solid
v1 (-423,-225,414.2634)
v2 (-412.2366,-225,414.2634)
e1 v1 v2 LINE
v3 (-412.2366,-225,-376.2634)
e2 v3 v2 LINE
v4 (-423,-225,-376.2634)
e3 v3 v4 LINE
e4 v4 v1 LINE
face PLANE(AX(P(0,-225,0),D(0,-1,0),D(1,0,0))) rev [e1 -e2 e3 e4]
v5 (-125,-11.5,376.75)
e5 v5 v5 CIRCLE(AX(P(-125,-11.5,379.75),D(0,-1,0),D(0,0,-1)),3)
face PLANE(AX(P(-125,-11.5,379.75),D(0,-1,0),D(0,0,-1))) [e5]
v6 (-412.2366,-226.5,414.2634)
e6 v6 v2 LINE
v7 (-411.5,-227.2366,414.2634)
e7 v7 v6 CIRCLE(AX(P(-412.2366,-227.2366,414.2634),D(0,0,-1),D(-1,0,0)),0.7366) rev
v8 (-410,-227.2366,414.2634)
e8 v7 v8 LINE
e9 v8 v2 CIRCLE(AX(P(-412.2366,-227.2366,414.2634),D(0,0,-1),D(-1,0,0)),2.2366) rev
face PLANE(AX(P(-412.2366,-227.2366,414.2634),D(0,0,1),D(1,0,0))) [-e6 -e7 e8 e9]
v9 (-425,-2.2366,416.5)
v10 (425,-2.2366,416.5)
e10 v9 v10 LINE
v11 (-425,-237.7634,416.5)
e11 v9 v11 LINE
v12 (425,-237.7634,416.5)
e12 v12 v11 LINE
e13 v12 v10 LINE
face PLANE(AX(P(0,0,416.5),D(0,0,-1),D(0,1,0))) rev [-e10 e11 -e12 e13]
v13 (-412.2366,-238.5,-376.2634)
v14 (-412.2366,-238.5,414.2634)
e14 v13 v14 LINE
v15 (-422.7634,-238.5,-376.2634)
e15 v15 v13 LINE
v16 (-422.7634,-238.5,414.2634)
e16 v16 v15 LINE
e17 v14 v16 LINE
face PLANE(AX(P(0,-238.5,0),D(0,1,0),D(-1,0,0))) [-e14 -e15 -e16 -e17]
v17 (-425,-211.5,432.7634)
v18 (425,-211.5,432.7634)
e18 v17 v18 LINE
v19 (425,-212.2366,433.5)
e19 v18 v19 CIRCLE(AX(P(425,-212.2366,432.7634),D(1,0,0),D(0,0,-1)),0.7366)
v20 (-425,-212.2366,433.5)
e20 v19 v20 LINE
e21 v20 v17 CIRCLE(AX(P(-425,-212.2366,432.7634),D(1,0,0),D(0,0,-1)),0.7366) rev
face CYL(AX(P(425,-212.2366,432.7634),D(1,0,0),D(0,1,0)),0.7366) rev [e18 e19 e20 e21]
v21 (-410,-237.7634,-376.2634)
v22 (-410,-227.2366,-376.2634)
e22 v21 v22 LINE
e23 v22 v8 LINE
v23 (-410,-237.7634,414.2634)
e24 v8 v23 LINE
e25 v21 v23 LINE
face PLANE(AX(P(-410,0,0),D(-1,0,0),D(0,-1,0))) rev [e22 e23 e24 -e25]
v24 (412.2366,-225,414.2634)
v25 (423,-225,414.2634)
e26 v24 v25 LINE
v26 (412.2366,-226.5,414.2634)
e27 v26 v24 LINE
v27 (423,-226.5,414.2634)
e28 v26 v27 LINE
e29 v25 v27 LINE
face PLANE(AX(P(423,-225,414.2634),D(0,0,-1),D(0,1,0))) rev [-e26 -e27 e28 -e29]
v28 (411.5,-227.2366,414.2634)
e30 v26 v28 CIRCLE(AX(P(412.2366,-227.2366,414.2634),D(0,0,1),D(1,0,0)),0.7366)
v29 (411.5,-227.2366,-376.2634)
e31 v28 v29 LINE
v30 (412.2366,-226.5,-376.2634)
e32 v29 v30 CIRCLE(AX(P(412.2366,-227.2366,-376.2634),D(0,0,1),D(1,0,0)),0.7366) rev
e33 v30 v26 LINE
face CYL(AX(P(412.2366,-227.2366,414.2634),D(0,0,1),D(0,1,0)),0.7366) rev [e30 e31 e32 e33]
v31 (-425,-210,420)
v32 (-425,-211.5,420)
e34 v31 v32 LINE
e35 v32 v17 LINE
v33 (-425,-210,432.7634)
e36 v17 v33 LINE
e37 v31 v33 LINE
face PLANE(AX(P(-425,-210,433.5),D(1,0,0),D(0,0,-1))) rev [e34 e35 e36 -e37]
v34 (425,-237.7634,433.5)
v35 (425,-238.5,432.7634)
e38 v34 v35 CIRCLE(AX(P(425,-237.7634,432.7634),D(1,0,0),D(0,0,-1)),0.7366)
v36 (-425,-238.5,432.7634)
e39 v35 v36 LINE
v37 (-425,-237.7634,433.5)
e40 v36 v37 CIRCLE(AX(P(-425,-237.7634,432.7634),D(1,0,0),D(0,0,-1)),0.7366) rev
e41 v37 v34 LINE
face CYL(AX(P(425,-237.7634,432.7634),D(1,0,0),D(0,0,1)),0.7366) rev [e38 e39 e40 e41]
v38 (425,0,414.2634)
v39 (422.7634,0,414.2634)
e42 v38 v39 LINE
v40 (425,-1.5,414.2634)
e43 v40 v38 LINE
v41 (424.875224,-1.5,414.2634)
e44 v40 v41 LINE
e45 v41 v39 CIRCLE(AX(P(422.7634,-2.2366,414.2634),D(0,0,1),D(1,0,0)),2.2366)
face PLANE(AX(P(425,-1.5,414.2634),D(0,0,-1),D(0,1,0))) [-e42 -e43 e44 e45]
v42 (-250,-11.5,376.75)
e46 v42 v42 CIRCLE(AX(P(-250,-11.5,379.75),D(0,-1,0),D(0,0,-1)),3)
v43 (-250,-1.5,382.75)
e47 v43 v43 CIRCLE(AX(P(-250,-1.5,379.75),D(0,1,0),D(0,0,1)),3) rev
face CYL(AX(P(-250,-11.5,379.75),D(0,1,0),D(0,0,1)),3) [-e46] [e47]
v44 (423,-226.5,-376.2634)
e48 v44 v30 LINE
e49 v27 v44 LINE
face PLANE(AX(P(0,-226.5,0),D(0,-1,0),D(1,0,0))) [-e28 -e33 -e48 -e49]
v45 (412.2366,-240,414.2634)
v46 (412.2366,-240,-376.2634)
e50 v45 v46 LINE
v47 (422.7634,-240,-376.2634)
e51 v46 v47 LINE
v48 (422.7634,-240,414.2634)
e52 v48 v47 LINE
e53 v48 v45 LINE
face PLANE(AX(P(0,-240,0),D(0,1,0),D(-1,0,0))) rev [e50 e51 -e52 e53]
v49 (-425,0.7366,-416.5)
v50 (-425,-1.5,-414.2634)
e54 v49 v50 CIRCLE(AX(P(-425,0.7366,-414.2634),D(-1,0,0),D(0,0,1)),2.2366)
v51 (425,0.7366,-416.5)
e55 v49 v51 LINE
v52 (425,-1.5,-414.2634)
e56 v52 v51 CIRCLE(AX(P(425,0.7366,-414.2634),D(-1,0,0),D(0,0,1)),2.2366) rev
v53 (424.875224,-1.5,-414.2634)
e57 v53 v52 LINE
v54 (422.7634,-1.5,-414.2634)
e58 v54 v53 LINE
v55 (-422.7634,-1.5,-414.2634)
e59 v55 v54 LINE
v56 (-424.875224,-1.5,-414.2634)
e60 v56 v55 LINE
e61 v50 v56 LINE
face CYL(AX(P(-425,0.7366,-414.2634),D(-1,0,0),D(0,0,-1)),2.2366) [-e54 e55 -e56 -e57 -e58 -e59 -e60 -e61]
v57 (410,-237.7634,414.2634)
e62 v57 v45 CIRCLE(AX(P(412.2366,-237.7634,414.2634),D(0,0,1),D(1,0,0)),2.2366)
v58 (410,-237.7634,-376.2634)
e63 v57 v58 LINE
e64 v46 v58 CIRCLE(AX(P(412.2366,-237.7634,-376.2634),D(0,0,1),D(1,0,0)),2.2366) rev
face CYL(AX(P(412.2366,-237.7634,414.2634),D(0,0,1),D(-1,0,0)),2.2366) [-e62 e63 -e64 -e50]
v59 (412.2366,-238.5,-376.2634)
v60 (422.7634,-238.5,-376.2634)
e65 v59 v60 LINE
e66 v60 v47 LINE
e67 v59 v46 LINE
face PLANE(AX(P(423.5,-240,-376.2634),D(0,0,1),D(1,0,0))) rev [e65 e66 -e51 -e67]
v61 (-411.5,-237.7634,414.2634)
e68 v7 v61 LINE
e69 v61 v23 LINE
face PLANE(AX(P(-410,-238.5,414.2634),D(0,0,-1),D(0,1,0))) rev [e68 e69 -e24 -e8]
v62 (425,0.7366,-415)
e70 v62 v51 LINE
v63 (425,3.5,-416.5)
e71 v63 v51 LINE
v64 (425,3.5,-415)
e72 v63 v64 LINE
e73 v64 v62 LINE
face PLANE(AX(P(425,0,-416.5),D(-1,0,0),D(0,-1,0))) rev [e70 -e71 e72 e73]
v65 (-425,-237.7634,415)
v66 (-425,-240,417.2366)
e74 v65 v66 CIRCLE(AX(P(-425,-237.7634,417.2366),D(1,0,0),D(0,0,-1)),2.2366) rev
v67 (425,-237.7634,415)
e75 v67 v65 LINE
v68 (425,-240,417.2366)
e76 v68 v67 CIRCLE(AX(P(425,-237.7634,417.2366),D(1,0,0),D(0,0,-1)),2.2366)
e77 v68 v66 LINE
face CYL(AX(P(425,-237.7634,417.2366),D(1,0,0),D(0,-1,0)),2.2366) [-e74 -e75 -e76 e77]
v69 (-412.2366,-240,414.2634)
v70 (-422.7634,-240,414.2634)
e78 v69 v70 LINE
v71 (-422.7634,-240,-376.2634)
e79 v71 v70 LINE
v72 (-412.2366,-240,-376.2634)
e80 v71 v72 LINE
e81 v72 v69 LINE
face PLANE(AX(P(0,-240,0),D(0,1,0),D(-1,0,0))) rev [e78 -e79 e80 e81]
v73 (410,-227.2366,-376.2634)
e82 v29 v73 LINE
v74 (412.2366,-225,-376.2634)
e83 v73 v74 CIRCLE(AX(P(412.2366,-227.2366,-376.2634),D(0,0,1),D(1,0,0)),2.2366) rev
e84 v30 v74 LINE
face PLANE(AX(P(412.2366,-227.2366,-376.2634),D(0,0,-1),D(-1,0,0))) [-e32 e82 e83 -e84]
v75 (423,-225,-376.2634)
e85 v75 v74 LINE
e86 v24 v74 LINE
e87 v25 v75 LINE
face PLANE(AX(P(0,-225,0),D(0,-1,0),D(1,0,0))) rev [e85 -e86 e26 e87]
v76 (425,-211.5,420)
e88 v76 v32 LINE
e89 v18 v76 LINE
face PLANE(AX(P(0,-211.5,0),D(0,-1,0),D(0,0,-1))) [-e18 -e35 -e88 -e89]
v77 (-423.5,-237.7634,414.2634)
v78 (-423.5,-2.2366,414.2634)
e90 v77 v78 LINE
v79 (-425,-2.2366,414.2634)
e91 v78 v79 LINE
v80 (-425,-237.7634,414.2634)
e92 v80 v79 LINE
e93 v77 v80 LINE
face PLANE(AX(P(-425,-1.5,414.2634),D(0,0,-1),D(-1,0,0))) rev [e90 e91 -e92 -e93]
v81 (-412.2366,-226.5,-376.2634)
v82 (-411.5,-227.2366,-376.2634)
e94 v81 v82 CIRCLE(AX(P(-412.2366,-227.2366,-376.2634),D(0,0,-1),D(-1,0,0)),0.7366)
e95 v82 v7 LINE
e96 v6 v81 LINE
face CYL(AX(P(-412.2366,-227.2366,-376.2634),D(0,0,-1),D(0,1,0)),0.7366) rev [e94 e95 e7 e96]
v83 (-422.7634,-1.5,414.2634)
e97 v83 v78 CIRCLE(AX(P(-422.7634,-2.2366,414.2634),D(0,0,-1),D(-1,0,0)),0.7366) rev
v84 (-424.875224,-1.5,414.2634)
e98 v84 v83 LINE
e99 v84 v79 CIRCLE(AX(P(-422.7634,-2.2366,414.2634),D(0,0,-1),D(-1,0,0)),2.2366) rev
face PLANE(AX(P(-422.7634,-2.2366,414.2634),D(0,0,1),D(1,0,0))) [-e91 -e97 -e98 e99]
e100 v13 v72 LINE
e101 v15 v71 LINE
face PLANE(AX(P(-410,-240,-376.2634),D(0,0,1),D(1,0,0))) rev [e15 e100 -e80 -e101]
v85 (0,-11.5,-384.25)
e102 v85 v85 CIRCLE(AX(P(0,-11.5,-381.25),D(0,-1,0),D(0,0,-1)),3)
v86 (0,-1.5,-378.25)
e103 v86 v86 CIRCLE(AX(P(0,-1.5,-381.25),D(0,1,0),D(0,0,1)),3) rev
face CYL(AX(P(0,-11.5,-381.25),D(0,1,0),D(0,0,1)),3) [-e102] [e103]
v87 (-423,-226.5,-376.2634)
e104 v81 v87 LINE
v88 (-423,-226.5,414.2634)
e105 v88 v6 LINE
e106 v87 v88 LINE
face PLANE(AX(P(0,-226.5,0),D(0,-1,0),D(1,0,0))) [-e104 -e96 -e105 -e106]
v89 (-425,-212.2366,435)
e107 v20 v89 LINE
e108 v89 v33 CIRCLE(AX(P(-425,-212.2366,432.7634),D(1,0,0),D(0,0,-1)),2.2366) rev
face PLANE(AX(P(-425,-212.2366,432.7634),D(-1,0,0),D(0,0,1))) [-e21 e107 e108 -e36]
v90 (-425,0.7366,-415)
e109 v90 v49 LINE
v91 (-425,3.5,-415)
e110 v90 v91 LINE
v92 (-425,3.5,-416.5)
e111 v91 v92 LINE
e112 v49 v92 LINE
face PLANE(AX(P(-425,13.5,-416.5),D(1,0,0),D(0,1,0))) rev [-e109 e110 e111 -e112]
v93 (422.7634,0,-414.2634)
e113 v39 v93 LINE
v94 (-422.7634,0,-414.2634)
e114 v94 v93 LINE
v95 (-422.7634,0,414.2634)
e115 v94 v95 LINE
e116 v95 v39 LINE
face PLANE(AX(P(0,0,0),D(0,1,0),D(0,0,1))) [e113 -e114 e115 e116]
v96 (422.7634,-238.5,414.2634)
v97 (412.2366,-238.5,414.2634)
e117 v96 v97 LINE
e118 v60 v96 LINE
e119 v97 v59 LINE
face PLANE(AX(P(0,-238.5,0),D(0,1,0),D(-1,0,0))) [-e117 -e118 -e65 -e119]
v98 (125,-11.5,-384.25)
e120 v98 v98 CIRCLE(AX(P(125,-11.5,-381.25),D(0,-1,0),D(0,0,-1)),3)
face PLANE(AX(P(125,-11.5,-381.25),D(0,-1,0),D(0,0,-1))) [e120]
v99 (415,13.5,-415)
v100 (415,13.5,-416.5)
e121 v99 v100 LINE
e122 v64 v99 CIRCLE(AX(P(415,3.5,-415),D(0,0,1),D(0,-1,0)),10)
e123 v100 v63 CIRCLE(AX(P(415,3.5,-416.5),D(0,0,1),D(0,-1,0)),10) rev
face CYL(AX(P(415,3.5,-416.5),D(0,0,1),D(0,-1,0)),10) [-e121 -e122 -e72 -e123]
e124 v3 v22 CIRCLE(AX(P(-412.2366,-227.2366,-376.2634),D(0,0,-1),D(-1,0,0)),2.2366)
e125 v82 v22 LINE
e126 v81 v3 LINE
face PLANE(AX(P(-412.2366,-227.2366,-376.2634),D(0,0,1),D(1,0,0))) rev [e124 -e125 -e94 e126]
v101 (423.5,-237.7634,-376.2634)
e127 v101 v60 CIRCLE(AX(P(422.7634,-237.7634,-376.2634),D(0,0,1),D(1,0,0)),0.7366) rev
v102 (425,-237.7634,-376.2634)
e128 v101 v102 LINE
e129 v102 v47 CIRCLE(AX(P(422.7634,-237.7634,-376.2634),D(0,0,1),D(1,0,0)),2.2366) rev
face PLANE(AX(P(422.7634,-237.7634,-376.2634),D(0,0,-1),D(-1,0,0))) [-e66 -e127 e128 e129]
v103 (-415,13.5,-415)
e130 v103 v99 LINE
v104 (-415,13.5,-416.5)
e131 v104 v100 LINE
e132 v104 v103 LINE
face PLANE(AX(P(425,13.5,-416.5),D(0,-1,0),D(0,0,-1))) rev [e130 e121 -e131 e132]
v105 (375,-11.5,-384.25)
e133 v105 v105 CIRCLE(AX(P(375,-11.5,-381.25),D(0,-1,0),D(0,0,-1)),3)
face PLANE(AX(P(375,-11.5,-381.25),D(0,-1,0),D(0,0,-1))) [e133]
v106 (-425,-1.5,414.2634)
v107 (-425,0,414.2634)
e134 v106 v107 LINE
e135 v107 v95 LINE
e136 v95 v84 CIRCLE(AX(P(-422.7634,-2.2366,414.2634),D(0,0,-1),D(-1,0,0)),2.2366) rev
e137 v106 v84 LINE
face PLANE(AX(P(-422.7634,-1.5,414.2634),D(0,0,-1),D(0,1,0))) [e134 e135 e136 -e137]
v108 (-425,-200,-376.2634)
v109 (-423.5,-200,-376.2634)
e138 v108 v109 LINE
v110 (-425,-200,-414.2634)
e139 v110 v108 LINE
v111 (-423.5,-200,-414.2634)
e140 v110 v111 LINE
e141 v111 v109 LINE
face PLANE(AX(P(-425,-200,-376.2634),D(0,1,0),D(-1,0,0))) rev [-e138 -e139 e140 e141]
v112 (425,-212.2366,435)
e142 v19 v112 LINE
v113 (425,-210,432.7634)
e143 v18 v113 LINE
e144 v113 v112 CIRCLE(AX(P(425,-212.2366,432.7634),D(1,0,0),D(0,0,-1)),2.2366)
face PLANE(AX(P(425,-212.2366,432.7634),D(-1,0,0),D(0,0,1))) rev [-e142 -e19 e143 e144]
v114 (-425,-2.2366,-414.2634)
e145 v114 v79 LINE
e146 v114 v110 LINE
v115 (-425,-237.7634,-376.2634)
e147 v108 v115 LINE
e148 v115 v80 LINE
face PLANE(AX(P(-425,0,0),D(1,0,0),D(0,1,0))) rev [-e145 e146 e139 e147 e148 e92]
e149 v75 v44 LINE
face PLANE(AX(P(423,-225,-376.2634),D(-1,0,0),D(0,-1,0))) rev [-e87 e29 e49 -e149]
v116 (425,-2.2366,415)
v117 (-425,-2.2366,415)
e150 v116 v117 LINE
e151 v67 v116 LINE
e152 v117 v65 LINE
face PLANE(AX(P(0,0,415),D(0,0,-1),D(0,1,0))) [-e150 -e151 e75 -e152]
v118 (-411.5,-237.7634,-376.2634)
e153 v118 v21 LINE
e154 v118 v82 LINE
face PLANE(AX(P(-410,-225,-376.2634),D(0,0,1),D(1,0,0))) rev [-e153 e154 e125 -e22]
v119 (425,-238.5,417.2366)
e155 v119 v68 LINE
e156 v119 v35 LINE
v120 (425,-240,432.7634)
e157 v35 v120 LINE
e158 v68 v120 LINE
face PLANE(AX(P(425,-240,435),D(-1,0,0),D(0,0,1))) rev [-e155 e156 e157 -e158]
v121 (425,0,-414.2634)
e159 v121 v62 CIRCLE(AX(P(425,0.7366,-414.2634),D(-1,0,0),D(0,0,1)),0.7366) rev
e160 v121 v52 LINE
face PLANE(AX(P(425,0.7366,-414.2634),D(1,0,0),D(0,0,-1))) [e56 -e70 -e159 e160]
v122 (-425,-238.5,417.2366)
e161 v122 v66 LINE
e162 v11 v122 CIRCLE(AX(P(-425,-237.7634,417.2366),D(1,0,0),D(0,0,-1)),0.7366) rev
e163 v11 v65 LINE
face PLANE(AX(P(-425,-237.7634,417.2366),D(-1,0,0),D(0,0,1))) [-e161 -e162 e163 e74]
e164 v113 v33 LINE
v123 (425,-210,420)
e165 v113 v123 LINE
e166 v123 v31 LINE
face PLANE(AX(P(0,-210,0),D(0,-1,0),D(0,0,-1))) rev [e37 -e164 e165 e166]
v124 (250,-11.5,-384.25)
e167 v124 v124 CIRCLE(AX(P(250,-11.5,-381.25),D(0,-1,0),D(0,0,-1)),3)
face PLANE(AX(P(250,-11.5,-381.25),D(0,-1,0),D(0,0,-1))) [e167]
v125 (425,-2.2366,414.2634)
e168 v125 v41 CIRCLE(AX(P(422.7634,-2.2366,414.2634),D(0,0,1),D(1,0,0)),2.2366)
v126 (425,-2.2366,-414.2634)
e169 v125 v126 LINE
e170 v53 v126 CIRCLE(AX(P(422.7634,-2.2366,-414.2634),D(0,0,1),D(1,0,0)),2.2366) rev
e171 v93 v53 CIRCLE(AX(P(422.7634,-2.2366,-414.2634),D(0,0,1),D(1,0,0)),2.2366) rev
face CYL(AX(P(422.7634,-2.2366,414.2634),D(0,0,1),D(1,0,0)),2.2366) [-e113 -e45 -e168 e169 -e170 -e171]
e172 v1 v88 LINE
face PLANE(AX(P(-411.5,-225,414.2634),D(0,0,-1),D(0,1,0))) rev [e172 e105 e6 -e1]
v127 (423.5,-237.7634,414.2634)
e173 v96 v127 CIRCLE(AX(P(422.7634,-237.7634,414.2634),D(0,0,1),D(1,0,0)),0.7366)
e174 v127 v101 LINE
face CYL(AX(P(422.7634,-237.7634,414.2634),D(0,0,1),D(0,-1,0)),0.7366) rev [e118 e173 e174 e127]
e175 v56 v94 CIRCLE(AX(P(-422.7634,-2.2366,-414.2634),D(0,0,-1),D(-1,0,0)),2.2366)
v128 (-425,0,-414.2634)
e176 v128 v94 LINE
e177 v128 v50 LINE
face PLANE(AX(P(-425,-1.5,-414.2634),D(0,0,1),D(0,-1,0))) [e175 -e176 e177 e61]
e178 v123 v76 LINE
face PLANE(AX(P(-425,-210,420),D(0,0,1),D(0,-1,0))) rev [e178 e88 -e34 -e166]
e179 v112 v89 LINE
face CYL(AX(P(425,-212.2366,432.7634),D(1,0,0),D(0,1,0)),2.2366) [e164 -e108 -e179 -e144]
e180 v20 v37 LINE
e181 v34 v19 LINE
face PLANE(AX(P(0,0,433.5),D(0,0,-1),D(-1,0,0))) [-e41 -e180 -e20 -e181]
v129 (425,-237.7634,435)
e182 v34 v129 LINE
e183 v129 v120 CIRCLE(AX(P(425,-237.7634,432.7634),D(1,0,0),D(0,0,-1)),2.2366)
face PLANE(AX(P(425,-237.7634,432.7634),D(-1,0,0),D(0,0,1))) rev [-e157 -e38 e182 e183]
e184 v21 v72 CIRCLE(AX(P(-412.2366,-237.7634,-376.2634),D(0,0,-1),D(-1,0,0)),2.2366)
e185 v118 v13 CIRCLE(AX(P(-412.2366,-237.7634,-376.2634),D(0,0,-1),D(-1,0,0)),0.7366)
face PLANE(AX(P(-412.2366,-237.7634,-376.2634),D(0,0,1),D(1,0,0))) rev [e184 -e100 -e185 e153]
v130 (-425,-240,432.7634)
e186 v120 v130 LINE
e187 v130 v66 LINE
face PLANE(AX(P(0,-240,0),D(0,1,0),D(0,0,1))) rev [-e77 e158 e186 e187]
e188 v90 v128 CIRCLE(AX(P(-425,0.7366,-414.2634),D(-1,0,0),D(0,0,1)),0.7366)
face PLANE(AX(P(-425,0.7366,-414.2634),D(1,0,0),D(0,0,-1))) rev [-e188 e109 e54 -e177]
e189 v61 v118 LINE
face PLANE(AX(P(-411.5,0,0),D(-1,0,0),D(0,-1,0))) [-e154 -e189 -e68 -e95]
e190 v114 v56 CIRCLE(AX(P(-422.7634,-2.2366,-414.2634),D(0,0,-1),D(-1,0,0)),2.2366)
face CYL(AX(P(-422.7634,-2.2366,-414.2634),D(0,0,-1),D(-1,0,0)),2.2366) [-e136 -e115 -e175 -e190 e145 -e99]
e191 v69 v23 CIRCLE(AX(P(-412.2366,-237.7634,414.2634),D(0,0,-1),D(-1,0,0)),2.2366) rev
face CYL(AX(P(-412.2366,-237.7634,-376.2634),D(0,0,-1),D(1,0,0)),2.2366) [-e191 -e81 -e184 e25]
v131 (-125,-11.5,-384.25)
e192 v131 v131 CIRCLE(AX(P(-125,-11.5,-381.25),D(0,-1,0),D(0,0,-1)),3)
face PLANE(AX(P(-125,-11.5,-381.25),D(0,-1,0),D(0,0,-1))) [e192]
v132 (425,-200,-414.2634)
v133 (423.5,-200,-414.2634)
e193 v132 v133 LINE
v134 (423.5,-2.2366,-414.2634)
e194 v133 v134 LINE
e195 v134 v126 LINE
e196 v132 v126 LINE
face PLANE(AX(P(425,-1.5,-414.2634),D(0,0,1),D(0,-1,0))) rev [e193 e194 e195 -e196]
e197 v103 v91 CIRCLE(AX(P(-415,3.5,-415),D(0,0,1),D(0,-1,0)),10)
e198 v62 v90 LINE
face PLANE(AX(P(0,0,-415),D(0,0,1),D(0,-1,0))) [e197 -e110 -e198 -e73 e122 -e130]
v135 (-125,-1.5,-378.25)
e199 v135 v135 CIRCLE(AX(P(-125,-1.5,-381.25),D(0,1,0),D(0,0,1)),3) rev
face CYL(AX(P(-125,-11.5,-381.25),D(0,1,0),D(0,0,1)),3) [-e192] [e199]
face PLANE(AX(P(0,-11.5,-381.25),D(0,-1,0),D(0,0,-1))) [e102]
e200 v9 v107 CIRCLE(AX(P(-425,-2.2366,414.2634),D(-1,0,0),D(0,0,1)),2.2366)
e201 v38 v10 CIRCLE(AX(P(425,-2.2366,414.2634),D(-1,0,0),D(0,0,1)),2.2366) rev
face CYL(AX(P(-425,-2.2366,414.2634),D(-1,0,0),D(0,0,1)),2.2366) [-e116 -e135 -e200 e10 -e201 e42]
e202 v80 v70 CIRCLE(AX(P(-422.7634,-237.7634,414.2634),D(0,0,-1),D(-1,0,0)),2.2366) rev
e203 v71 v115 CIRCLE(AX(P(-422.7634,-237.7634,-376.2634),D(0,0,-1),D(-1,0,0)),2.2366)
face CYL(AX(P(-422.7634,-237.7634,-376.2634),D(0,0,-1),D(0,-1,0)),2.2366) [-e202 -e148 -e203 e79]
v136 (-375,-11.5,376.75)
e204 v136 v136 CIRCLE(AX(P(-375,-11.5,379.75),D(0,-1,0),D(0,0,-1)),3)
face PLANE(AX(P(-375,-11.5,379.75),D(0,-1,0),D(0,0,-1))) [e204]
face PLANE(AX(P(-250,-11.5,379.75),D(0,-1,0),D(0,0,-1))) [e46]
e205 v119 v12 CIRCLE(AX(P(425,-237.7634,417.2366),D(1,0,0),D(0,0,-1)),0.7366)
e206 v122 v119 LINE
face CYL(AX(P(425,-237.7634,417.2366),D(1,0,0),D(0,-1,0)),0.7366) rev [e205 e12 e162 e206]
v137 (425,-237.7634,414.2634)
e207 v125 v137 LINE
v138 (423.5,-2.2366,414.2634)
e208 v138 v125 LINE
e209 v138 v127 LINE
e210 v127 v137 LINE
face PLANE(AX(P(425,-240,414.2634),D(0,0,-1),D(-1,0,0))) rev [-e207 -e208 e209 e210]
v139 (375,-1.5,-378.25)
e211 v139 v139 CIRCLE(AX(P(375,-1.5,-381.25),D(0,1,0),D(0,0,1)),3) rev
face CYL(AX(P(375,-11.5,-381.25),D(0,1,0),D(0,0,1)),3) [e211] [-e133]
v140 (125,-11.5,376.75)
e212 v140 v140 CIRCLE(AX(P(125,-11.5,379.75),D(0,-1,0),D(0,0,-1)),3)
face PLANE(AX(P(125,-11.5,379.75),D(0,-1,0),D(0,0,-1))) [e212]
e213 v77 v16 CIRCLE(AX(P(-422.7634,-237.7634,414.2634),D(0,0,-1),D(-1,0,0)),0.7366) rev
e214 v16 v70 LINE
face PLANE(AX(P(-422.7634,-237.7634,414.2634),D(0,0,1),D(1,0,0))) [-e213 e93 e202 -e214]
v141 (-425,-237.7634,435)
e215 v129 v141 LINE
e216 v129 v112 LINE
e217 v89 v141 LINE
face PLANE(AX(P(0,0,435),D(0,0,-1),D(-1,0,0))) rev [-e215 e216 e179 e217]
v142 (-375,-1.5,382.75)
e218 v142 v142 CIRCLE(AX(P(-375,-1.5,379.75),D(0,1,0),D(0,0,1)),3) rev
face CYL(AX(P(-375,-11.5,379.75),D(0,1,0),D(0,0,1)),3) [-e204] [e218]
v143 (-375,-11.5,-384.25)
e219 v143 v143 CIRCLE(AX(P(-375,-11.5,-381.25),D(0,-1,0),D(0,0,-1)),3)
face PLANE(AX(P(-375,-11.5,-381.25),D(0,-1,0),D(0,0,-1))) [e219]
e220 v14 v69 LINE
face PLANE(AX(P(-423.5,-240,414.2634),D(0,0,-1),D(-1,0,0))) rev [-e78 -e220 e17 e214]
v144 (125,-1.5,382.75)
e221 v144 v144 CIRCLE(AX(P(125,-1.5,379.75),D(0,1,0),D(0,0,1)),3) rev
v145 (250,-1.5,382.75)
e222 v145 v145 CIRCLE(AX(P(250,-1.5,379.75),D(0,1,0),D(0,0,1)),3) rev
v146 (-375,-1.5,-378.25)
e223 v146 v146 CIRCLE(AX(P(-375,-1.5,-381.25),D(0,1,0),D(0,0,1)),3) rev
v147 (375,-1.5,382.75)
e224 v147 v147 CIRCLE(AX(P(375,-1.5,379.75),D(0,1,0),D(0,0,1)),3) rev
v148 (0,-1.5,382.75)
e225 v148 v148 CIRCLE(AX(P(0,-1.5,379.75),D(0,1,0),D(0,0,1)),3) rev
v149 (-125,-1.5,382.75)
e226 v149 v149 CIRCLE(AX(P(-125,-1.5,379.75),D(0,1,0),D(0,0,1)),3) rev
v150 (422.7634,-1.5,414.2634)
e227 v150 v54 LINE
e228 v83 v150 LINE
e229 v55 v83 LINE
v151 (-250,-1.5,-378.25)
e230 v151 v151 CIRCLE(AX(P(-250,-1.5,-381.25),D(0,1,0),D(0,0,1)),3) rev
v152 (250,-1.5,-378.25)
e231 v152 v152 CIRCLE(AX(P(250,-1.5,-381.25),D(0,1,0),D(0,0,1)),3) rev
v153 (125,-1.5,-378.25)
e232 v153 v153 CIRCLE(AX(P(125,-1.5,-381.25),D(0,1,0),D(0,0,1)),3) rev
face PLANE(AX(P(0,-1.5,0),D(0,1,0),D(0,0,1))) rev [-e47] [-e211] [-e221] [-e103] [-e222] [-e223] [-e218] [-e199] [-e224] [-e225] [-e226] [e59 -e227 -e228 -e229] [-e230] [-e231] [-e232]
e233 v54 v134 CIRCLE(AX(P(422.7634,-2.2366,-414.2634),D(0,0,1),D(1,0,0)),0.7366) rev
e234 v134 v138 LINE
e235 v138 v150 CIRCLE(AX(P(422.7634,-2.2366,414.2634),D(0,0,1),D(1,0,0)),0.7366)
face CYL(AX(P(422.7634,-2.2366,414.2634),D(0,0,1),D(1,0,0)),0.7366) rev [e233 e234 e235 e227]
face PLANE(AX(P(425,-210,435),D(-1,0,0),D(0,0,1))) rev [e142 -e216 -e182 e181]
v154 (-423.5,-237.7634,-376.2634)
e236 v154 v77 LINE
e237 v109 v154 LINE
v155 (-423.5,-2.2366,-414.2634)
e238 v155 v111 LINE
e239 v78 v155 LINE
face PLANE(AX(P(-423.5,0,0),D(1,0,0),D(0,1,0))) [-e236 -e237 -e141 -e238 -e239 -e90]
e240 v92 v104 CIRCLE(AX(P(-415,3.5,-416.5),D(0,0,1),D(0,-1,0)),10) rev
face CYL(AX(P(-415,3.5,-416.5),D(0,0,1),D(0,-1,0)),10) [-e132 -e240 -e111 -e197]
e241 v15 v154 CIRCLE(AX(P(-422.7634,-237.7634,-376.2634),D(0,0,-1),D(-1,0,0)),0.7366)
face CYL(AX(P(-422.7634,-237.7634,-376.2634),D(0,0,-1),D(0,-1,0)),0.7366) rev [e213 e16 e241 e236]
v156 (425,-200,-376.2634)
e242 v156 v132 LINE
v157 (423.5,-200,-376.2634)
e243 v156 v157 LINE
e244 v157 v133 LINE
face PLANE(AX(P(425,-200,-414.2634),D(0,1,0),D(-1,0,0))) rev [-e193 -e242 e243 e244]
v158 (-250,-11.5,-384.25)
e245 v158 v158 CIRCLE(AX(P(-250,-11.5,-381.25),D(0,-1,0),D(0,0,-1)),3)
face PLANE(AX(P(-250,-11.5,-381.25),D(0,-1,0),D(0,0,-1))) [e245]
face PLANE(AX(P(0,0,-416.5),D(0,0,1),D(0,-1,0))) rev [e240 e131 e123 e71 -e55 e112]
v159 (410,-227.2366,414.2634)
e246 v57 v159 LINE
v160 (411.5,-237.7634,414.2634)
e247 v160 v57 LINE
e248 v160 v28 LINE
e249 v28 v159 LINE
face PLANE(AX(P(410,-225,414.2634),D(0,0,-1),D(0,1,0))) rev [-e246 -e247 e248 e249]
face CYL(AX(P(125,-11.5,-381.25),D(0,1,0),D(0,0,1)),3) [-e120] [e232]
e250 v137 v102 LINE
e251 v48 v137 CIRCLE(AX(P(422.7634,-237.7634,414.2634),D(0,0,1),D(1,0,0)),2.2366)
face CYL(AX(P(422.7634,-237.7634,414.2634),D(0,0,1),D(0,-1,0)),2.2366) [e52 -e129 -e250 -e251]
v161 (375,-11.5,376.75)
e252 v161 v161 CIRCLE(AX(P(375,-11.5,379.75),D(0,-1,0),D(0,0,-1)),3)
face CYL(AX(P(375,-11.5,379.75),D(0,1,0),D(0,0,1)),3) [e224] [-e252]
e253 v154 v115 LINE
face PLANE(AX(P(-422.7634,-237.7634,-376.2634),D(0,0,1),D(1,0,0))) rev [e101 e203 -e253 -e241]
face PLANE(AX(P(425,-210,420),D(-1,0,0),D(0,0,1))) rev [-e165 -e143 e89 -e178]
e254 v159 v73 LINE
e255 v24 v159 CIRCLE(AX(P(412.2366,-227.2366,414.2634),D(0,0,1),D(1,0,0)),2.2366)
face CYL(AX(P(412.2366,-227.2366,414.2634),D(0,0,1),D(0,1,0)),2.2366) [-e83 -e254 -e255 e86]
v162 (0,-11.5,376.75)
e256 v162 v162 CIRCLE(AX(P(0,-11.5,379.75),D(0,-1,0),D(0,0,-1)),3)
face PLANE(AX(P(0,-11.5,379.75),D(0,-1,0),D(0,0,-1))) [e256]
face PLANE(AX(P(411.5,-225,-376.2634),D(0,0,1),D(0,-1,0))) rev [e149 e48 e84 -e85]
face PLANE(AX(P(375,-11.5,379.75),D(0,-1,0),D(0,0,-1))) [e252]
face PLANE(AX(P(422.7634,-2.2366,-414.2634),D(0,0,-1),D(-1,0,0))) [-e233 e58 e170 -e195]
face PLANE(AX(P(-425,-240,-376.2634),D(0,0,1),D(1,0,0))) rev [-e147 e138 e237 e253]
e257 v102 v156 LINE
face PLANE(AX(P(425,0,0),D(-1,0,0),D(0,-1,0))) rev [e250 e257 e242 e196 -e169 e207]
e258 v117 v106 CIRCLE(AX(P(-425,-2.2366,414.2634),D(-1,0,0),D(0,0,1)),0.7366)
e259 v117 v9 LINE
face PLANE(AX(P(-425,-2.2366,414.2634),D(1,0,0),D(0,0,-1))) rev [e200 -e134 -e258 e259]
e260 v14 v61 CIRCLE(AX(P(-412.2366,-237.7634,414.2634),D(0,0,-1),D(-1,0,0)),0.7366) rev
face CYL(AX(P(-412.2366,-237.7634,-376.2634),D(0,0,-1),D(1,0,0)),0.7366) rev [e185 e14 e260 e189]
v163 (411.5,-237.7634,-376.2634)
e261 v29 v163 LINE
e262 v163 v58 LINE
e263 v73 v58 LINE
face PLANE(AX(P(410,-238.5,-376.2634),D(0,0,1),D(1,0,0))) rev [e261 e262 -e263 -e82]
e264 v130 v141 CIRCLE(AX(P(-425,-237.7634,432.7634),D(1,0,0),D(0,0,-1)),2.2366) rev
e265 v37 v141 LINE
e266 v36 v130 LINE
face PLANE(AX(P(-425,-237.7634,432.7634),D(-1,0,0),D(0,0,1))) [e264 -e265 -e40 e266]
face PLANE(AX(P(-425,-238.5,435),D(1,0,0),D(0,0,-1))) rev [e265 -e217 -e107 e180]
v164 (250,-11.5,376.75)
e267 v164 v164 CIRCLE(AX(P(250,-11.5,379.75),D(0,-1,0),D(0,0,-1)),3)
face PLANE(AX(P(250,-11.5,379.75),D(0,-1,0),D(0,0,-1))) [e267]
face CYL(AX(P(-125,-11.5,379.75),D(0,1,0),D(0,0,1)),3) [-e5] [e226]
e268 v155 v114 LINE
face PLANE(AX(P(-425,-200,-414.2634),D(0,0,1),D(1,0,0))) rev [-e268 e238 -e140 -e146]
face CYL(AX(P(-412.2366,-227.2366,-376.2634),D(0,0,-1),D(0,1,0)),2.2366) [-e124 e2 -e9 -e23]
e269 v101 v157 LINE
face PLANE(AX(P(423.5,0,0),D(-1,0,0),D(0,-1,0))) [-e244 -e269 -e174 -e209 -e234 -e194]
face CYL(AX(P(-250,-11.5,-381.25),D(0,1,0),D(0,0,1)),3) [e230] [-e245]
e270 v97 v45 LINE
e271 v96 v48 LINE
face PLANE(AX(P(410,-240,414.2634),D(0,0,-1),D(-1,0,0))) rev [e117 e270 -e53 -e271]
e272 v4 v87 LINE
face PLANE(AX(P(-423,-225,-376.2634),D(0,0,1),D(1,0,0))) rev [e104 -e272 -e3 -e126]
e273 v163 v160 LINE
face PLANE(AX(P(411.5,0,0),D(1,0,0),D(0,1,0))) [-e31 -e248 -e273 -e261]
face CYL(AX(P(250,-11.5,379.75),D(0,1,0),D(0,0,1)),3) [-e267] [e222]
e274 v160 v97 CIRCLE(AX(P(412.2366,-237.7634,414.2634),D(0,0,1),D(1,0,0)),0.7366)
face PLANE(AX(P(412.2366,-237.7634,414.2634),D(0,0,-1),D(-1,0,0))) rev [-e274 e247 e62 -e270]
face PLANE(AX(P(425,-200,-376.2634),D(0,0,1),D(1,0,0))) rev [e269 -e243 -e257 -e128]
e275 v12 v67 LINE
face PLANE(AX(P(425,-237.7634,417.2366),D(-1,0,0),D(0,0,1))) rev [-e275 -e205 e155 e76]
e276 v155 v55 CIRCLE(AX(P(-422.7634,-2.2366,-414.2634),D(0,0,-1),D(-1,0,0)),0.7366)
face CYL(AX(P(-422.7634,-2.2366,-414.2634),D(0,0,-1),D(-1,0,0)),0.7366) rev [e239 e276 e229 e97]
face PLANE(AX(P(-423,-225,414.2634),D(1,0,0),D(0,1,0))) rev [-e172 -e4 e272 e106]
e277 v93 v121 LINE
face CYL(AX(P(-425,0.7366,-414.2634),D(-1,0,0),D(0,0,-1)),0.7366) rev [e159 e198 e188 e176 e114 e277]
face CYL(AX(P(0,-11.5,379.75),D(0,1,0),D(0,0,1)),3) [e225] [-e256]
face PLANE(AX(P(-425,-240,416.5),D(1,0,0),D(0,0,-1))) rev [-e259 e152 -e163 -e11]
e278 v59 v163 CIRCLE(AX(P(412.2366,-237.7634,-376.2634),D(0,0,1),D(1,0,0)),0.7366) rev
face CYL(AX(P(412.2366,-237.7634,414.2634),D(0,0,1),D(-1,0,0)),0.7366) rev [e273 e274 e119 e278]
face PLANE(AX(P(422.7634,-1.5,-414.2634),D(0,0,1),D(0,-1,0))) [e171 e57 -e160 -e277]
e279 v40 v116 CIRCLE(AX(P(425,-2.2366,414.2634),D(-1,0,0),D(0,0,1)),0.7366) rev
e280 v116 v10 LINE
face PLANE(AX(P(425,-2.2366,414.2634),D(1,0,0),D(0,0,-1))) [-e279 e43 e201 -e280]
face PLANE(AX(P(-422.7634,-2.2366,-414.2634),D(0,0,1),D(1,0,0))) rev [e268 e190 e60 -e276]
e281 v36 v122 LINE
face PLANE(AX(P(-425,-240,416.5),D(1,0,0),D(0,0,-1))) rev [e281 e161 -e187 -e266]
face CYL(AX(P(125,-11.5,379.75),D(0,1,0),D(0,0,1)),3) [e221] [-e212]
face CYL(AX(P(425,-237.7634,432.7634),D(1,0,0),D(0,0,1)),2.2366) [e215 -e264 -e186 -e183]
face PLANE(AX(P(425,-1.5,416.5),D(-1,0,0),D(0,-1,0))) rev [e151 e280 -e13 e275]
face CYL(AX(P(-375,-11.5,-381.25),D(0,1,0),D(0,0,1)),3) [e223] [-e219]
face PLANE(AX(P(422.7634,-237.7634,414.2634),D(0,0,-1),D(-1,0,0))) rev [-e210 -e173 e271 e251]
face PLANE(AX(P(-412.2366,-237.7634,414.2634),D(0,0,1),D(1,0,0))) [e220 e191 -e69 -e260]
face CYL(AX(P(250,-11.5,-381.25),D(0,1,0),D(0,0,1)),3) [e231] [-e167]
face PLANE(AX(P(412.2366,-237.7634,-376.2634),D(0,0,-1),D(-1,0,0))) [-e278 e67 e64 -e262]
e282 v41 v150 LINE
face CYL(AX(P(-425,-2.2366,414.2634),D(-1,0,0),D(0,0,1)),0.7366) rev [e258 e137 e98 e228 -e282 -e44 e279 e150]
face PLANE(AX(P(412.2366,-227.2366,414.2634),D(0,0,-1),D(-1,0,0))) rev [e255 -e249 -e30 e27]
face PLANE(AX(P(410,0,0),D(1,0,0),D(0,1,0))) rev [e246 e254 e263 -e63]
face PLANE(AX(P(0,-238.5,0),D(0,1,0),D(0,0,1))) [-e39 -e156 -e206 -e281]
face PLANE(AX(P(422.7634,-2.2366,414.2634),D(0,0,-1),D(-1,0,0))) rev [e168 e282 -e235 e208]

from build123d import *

# Parameters (mm, degrees)
SKETCH_1_W                          = 850
SKETCH_1_H                          = 833
SM_BASE_FLANGE_1_DEPTH              = 1.5
SM_EDGE_FLANGE_1_STRIP_W            = 7.4732
SM_EDGE_FLANGE_1_STRIP_H            = 1.5
SM_EDGE_FLANGE_1_STRIP_CUT_DEPTH    = 850
SM_EDGE_FLANGE_1_DEPTH              = 850
SM_EDGE_FLANGE_3_STRIP_W            = 7.4732
SM_EDGE_FLANGE_3_STRIP_H            = 1.5
SM_EDGE_FLANGE_3_STRIP_CUT_DEPTH    = 850
SM_EDGE_FLANGE_3_DEPTH              = 850
SM_EDGE_FLANGE_4_STRIP_W            = 7.4732
SM_EDGE_FLANGE_4_STRIP_H            = 1.5
SM_EDGE_FLANGE_4_STRIP_CUT_DEPTH    = 850
SM_EDGE_FLANGE_4_DEPTH              = 850
SM_EDGE_FLANGE_7_STRIP_W            = 7.4732
SM_EDGE_FLANGE_7_STRIP_H            = 1.5
SM_EDGE_FLANGE_7_STRIP_CUT_DEPTH    = 828.5268
SM_EDGE_FLANGE_7_STRIP_2_W          = 7.4732
SM_EDGE_FLANGE_7_STRIP_2_H          = 1.5
SM_EDGE_FLANGE_7_STRIP_CUT_2_DEPTH  = 828.5268
SM_EDGE_FLANGE_7_DEPTH              = 828.5268
SM_EDGE_FLANGE_7_FLAT_DEPTH         = 1.5
SM_EDGE_FLANGE_7_BEND_DEPTH         = 828.5268
SM_EDGE_FLANGE_7_FLAT_2_DEPTH       = 1.5
SM_EDGE_FLANGE_8_STRIP_W            = 7.4732
SM_EDGE_FLANGE_8_STRIP_H            = 1.5
SM_EDGE_FLANGE_8_STRIP_CUT_DEPTH    = 790.5268
SM_EDGE_FLANGE_8_STRIP_2_W          = 7.4732
SM_EDGE_FLANGE_8_STRIP_2_H          = 1.5
SM_EDGE_FLANGE_8_STRIP_CUT_2_DEPTH  = 790.5268
SM_EDGE_FLANGE_8_DEPTH              = 790.5268
SM_EDGE_FLANGE_8_BEND_DEPTH         = 790.5268
SM_EDGE_FLANGE_9_STRIP_W            = 7.4732
SM_EDGE_FLANGE_9_STRIP_H            = 1.5
SM_EDGE_FLANGE_9_STRIP_CUT_DEPTH    = 790.5268
SM_EDGE_FLANGE_9_STRIP_2_W          = 7.4732
SM_EDGE_FLANGE_9_STRIP_2_H          = 1.5
SM_EDGE_FLANGE_9_STRIP_CUT_2_DEPTH  = 790.5268
SM_EDGE_FLANGE_9_DEPTH              = 790.5268
SM_EDGE_FLANGE_9_BEND_DEPTH         = 790.5268
FILLET_1_R                          = 10
SKETCH_56_R                         = 3
EXTRUDE_1_DEPTH                     = 10
SM_EDGE_FLANGE_10_STRIP_W           = 7.4732
SM_EDGE_FLANGE_10_STRIP_H           = 1.5
SM_EDGE_FLANGE_10_STRIP_CUT_DEPTH   = 850
SM_EDGE_FLANGE_10_DEPTH             = 850
SM_EDGE_FLANGE_11_STRIP_W           = 7.4732
SM_EDGE_FLANGE_11_STRIP_H           = 1.5
SM_EDGE_FLANGE_11_STRIP_CUT_DEPTH   = 850
SM_EDGE_FLANGE_11_DEPTH             = 850
SM_EDGE_FLANGE_12_STRIP_W           = 7.4732
SM_EDGE_FLANGE_12_STRIP_H           = 1.5
SM_EDGE_FLANGE_12_STRIP_CUT_DEPTH   = 790.5268
SM_EDGE_FLANGE_12_STRIP_2_W         = 7.4732
SM_EDGE_FLANGE_12_STRIP_2_H         = 1.5
SM_EDGE_FLANGE_12_STRIP_CUT_2_DEPTH = 790.5268
SM_EDGE_FLANGE_12_DEPTH             = 790.5268
SM_EDGE_FLANGE_12_BEND_DEPTH        = 790.5268


# Sheet-metal steps are written as plain solids
with BuildPart() as part:
    # Sketch 1 → 基体-法兰1 (new body)
    with BuildSketch(Plane(origin=(0, 0, 0), x_dir=(1, 0, 0), z_dir=(0, 1, 0))):
        Rectangle(SKETCH_1_W, SKETCH_1_H)
    extrude(amount=-SM_BASE_FLANGE_1_DEPTH)

    # 边线-法兰1 strip (across the edge) → 边线-法兰1 strip cut (cut)
    with BuildSketch(Plane(origin=(425, 0, -416.5), x_dir=(0, 0, 1), z_dir=(-1, 0, 0))):
        with Locations((-1.5, -0.75)):
            Rectangle(SM_EDGE_FLANGE_1_STRIP_W, SM_EDGE_FLANGE_1_STRIP_H)
    extrude(amount=SM_EDGE_FLANGE_1_STRIP_CUT_DEPTH, mode=Mode.SUBTRACT)

    # 边线-法兰1 section (across the edge) → 边线-法兰1 (add)
    with BuildSketch(Plane(origin=(425, 0, -416.5), x_dir=(0, 0, 1), z_dir=(-1, 0, 0))):
        with BuildLine():
            Line((0, 0.7366), (0, 13.5))
            Line((0, 13.5), (1.5, 13.5))
            Line((1.5, 13.5), (1.5, 0.7366))
            ThreePointArc((1.5, 0.7366), (1.715745145, 0.215745145), (2.2366, 0))
            Line((2.2366, 0), (2.2366, -1.5))
            ThreePointArc((2.2366, -1.5), (0.655084973, -0.844915027), (0, 0.7366))
        make_face()
    extrude(amount=SM_EDGE_FLANGE_1_DEPTH)

    # 边线-法兰3 strip (across the edge) → 边线-法兰3 strip cut (cut)
    with BuildSketch(Plane(origin=(425, -1.5, 416.5), x_dir=(0, 0, -1), z_dir=(-1, 0, 0))):
        with Locations((-1.5, -0.75)):
            Rectangle(SM_EDGE_FLANGE_3_STRIP_W, SM_EDGE_FLANGE_3_STRIP_H)
    extrude(amount=SM_EDGE_FLANGE_3_STRIP_CUT_DEPTH, mode=Mode.SUBTRACT)

    # 边线-法兰3 section (across the edge) → 边线-法兰3 (add)
    with BuildSketch(Plane(origin=(425, -1.5, 416.5), x_dir=(0, 0, -1), z_dir=(-1, 0, 0))):
        with BuildLine():
            Line((0, 0.7366), (0, 238.5))
            Line((0, 238.5), (1.5, 238.5))
            Line((1.5, 238.5), (1.5, 0.7366))
            ThreePointArc((1.5, 0.7366), (1.715745145, 0.215745145), (2.2366, 0))
            Line((2.2366, 0), (2.2366, -1.5))
            ThreePointArc((2.2366, -1.5), (0.655084973, -0.844915027), (0, 0.7366))
        make_face()
    extrude(amount=SM_EDGE_FLANGE_3_DEPTH)

    # 边线-法兰4 strip (across the edge) → 边线-法兰4 strip cut (cut)
    with BuildSketch(Plane(origin=(-425, -240, 416.5), x_dir=(0, 1, 0), z_dir=(1, 0, 0))):
        with Locations((-1.5, -0.75)):
            Rectangle(SM_EDGE_FLANGE_4_STRIP_W, SM_EDGE_FLANGE_4_STRIP_H)
    extrude(amount=SM_EDGE_FLANGE_4_STRIP_CUT_DEPTH, mode=Mode.SUBTRACT)

    # 边线-法兰4 section (across the edge) → 边线-法兰4 (add)
    with BuildSketch(Plane(origin=(-425, -240, 416.5), x_dir=(0, 1, 0), z_dir=(1, 0, 0))):
        with BuildLine():
            Line((0, 0.7366), (0, 18.5))
            Line((0, 18.5), (1.5, 18.5))
            Line((1.5, 18.5), (1.5, 0.7366))
            ThreePointArc((1.5, 0.7366), (1.715745145, 0.215745145), (2.2366, 0))
            Line((2.2366, 0), (2.2366, -1.5))
            ThreePointArc((2.2366, -1.5), (0.655084973, -0.844915027), (0, 0.7366))
        make_face()
    extrude(amount=SM_EDGE_FLANGE_4_DEPTH)

    # 边线-法兰7 strip (across the edge) → 边线-法兰7 strip cut (cut)
    with BuildSketch(Plane(origin=(-425, -1.5, 414.2634), x_dir=(1, 0, 0), z_dir=(0, 0, -1))):
        with Locations((-1.5, -0.75)):
            Rectangle(SM_EDGE_FLANGE_7_STRIP_W, SM_EDGE_FLANGE_7_STRIP_H)
    extrude(amount=SM_EDGE_FLANGE_7_STRIP_CUT_DEPTH, mode=Mode.SUBTRACT)

    # 边线-法兰7 strip 2 (across the edge) → 边线-法兰7 strip cut 2 (cut)
    with BuildSketch(Plane(origin=(425, -1.5, -414.2634), x_dir=(-1, 0, 0), z_dir=(0, 0, 1))):
        with Locations((-1.5, -0.75)):
            Rectangle(SM_EDGE_FLANGE_7_STRIP_2_W, SM_EDGE_FLANGE_7_STRIP_2_H)
    extrude(amount=SM_EDGE_FLANGE_7_STRIP_CUT_2_DEPTH, mode=Mode.SUBTRACT)

    # 边线-法兰7 bend section (across the edge) → 边线-法兰7 (add)
    with BuildSketch(Plane(origin=(-425, -1.5, 414.2634), x_dir=(1, 0, 0), z_dir=(0, 0, -1))):
        with BuildLine():
            Line((0, 0.7366), (1.5, 0.7366))
            ThreePointArc((1.5, 0.7366), (1.715745145, 0.215745145), (2.2366, 0))
            Line((2.2366, 0), (2.2366, -1.5))
            ThreePointArc((2.2366, -1.5), (0.655084973, -0.844915027), (0, 0.7366))
        make_face()
    extrude(amount=SM_EDGE_FLANGE_7_DEPTH)

    # 边线-法兰7 profile (on flange) → 边线-法兰7 flat (add)
    with BuildSketch(Plane(origin=(-425, -1.5, 0), x_dir=(0, 0, -1), z_dir=(-1, 0, 0))):
        Polygon((414.2634, 0.7366), (414.2634, 198.5), (376.2634, 198.5), (376.2634, 238.5), (-414.2634, 238.5), (-414.2634, 0.7366), align=None)
    extrude(amount=-SM_EDGE_FLANGE_7_FLAT_DEPTH)

    # 边线-法兰7 bend section 2 (across the edge) → 边线-法兰7 bend (add)
    with BuildSketch(Plane(origin=(425, -1.5, -414.2634), x_dir=(-1, 0, 0), z_dir=(0, 0, 1))):
        with BuildLine():
            Line((0, 0.7366), (1.5, 0.7366))
            ThreePointArc((1.5, 0.7366), (1.715745145, 0.215745145), (2.2366, 0))
            Line((2.2366, 0), (2.2366, -1.5))
            ThreePointArc((2.2366, -1.5), (0.655084973, -0.844915027), (0, 0.7366))
        make_face()
    extrude(amount=SM_EDGE_FLANGE_7_BEND_DEPTH)

    # 边线-法兰7 profile 2 (on flange) → 边线-法兰7 flat 2 (add)
    with BuildSketch(Plane(origin=(425, -1.5, 0), x_dir=(0, 0, 1), z_dir=(1, 0, 0))):
        Polygon((414.2634, 0.7366), (414.2634, 238.5), (-376.2634, 238.5), (-376.2634, 198.5), (-414.2634, 198.5), (-414.2634, 0.7366), align=None)
    extrude(amount=-SM_EDGE_FLANGE_7_FLAT_2_DEPTH)

    # 边线-法兰8 strip (across the edge) → 边线-法兰8 strip cut (cut)
    with BuildSketch(Plane(origin=(423.5, -240, -376.2634), x_dir=(0, 1, 0), z_dir=(0, 0, 1))):
        with Locations((-1.5, -0.75)):
            Rectangle(SM_EDGE_FLANGE_8_STRIP_W, SM_EDGE_FLANGE_8_STRIP_H)
    extrude(amount=SM_EDGE_FLANGE_8_STRIP_CUT_DEPTH, mode=Mode.SUBTRACT)

    # 边线-法兰8 strip 2 (across the edge) → 边线-法兰8 strip cut 2 (cut)
    with BuildSketch(Plane(origin=(-423.5, -240, 414.2634), x_dir=(0, 1, 0), z_dir=(0, 0, -1))):
        with Locations((-1.5, -0.75)):
            Rectangle(SM_EDGE_FLANGE_8_STRIP_2_W, SM_EDGE_FLANGE_8_STRIP_2_H)
    extrude(amount=SM_EDGE_FLANGE_8_STRIP_CUT_2_DEPTH, mode=Mode.SUBTRACT)

    # 边线-法兰8 section (across the edge) → 边线-法兰8 (add)
    with BuildSketch(Plane(origin=(423.5, -240, -376.2634), x_dir=(0, 1, 0), z_dir=(0, 0, 1))):
        with BuildLine():
            Line((0, 0.7366), (0, 13.5))
            Line((0, 13.5), (1.5, 13.5))
            Line((1.5, 13.5), (1.5, 0.7366))
            ThreePointArc((1.5, 0.7366), (1.715745145, 0.215745145), (2.2366, 0))
            Line((2.2366, 0), (2.2366, -1.5))
            ThreePointArc((2.2366, -1.5), (0.655084973, -0.844915027), (0, 0.7366))
        make_face()
    extrude(amount=SM_EDGE_FLANGE_8_DEPTH)

    # 边线-法兰8 section 2 (across the edge) → 边线-法兰8 bend (add)
    with BuildSketch(Plane(origin=(-423.5, -240, 414.2634), x_dir=(0, 1, 0), z_dir=(0, 0, -1))):
        with BuildLine():
            Line((0, 0.7366), (0, 13.5))
            Line((0, 13.5), (1.5, 13.5))
            Line((1.5, 13.5), (1.5, 0.7366))
            ThreePointArc((1.5, 0.7366), (1.715745145, 0.215745145), (2.2366, 0))
            Line((2.2366, 0), (2.2366, -1.5))
            ThreePointArc((2.2366, -1.5), (0.655084973, -0.844915027), (0, 0.7366))
        make_face()
    extrude(amount=SM_EDGE_FLANGE_8_BEND_DEPTH)

    # 边线-法兰9 strip (across the edge) → 边线-法兰9 strip cut (cut)
    with BuildSketch(Plane(origin=(410, -238.5, -376.2634), x_dir=(1, 0, 0), z_dir=(0, 0, 1))):
        with Locations((-1.5, -0.75)):
            Rectangle(SM_EDGE_FLANGE_9_STRIP_W, SM_EDGE_FLANGE_9_STRIP_H)
    extrude(amount=SM_EDGE_FLANGE_9_STRIP_CUT_DEPTH, mode=Mode.SUBTRACT)

    # 边线-法兰9 strip 2 (across the edge) → 边线-法兰9 strip cut 2 (cut)
    with BuildSketch(Plane(origin=(-410, -238.5, 414.2634), x_dir=(-1, 0, 0), z_dir=(0, 0, -1))):
        with Locations((-1.5, -0.75)):
            Rectangle(SM_EDGE_FLANGE_9_STRIP_2_W, SM_EDGE_FLANGE_9_STRIP_2_H)
    extrude(amount=SM_EDGE_FLANGE_9_STRIP_CUT_2_DEPTH, mode=Mode.SUBTRACT)

    # 边线-法兰9 section (across the edge) → 边线-法兰9 (add)
    with BuildSketch(Plane(origin=(410, -238.5, -376.2634), x_dir=(1, 0, 0), z_dir=(0, 0, 1))):
        with BuildLine():
            Line((0, 0.7366), (0, 13.5))
            Line((0, 13.5), (1.5, 13.5))
            Line((1.5, 13.5), (1.5, 0.7366))
            ThreePointArc((1.5, 0.7366), (1.715745145, 0.215745145), (2.2366, 0))
            Line((2.2366, 0), (2.2366, -1.5))
            ThreePointArc((2.2366, -1.5), (0.655084973, -0.844915027), (0, 0.7366))
        make_face()
    extrude(amount=SM_EDGE_FLANGE_9_DEPTH)

    # 边线-法兰9 section 2 (across the edge) → 边线-法兰9 bend (add)
    with BuildSketch(Plane(origin=(-410, -238.5, 414.2634), x_dir=(-1, 0, 0), z_dir=(0, 0, -1))):
        with BuildLine():
            Line((0, 0.7366), (0, 13.5))
            Line((0, 13.5), (1.5, 13.5))
            Line((1.5, 13.5), (1.5, 0.7366))
            ThreePointArc((1.5, 0.7366), (1.715745145, 0.215745145), (2.2366, 0))
            Line((2.2366, 0), (2.2366, -1.5))
            ThreePointArc((2.2366, -1.5), (0.655084973, -0.844915027), (0, 0.7366))
        make_face()
    extrude(amount=SM_EDGE_FLANGE_9_BEND_DEPTH)

    # 圆角1
    fillet_1_edges = [part.edges().sort_by_distance(p)[0] for p in [
        (425, 13.5, -415.75),
        (-425, 13.5, -415.75),
    ]]
    fillet(fillet_1_edges, radius=FILLET_1_R)

    # 草图56 → 凸台-拉伸1 (add)
    with BuildSketch(Plane.XZ.offset(1.5)):
        with Locations(Location((375, -381.25, 0), (0, 0, 90))):
            Circle(SKETCH_56_R)
        with Locations(Location((250, -381.25, 0), (0, 0, 90))):
            Circle(SKETCH_56_R)
        with Locations(Location((125, -381.25, 0), (0, 0, 90))):
            Circle(SKETCH_56_R)
        with Locations(Location((0, -381.25, 0), (0, 0, 90))):
            Circle(SKETCH_56_R)
        with Locations(Location((-125, -381.25, 0), (0, 0, 90))):
            Circle(SKETCH_56_R)
        with Locations(Location((-250, -381.25, 0), (0, 0, 90))):
            Circle(SKETCH_56_R)
        with Locations(Location((-375, -381.25, 0), (0, 0, 90))):
            Circle(SKETCH_56_R)
        with Locations(Location((375, 379.75, 0), (0, 0, 90))):
            Circle(SKETCH_56_R)
        with Locations(Location((250, 379.75, 0), (0, 0, 90))):
            Circle(SKETCH_56_R)
        with Locations(Location((125, 379.75, 0), (0, 0, 90))):
            Circle(SKETCH_56_R)
        with Locations(Location((0, 379.75, 0), (0, 0, 90))):
            Circle(SKETCH_56_R)
        with Locations(Location((-125, 379.75, 0), (0, 0, 90))):
            Circle(SKETCH_56_R)
        with Locations(Location((-250, 379.75, 0), (0, 0, 90))):
            Circle(SKETCH_56_R)
        with Locations(Location((-375, 379.75, 0), (0, 0, 90))):
            Circle(SKETCH_56_R)
    extrude(amount=EXTRUDE_1_DEPTH)

    # 边线-法兰10 strip (across the edge) → 边线-法兰10 strip cut (cut)
    with BuildSketch(Plane(origin=(-425, -238.5, 435), x_dir=(0, 0, -1), z_dir=(1, 0, 0))):
        with Locations((-1.5, -0.75)):
            Rectangle(SM_EDGE_FLANGE_10_STRIP_W, SM_EDGE_FLANGE_10_STRIP_H)
    extrude(amount=SM_EDGE_FLANGE_10_STRIP_CUT_DEPTH, mode=Mode.SUBTRACT)

    # 边线-法兰10 section (across the edge) → 边线-法兰10 (add)
    with BuildSketch(Plane(origin=(-425, -238.5, 435), x_dir=(0, 0, -1), z_dir=(1, 0, 0))):
        with BuildLine():
            Line((0, 0.7366), (0, 28.5))
            Line((0, 28.5), (1.5, 28.5))
            Line((1.5, 28.5), (1.5, 0.7366))
            ThreePointArc((1.5, 0.7366), (1.715745145, 0.215745145), (2.2366, 0))
            Line((2.2366, 0), (2.2366, -1.5))
            ThreePointArc((2.2366, -1.5), (0.655084973, -0.844915027), (0, 0.7366))
        make_face()
    extrude(amount=SM_EDGE_FLANGE_10_DEPTH)

    # 边线-法兰11 strip (across the edge) → 边线-法兰11 strip cut (cut)
    with BuildSketch(Plane(origin=(-425, -210, 433.5), x_dir=(0, -1, 0), z_dir=(1, 0, 0))):
        with Locations((-1.5, -0.75)):
            Rectangle(SM_EDGE_FLANGE_11_STRIP_W, SM_EDGE_FLANGE_11_STRIP_H)
    extrude(amount=SM_EDGE_FLANGE_11_STRIP_CUT_DEPTH, mode=Mode.SUBTRACT)

    # 边线-法兰11 section (across the edge) → 边线-法兰11 (add)
    with BuildSketch(Plane(origin=(-425, -210, 433.5), x_dir=(0, -1, 0), z_dir=(1, 0, 0))):
        with BuildLine():
            Line((0, 0.7366), (0, 13.5))
            Line((0, 13.5), (1.5, 13.5))
            Line((1.5, 13.5), (1.5, 0.7366))
            ThreePointArc((1.5, 0.7366), (1.715745145, 0.215745145), (2.2366, 0))
            Line((2.2366, 0), (2.2366, -1.5))
            ThreePointArc((2.2366, -1.5), (0.655084973, -0.844915027), (0, 0.7366))
        make_face()
    extrude(amount=SM_EDGE_FLANGE_11_DEPTH)

    # 边线-法兰12 strip (across the edge) → 边线-法兰12 strip cut (cut)
    with BuildSketch(Plane(origin=(411.5, -225, -376.2634), x_dir=(0, -1, 0), z_dir=(0, 0, 1))):
        with Locations((-1.5, -0.75)):
            Rectangle(SM_EDGE_FLANGE_12_STRIP_W, SM_EDGE_FLANGE_12_STRIP_H)
    extrude(amount=SM_EDGE_FLANGE_12_STRIP_CUT_DEPTH, mode=Mode.SUBTRACT)

    # 边线-法兰12 strip 2 (across the edge) → 边线-法兰12 strip cut 2 (cut)
    with BuildSketch(Plane(origin=(-411.5, -225, 414.2634), x_dir=(0, -1, 0), z_dir=(0, 0, -1))):
        with Locations((-1.5, -0.75)):
            Rectangle(SM_EDGE_FLANGE_12_STRIP_2_W, SM_EDGE_FLANGE_12_STRIP_2_H)
    extrude(amount=SM_EDGE_FLANGE_12_STRIP_CUT_2_DEPTH, mode=Mode.SUBTRACT)

    # 边线-法兰12 section (across the edge) → 边线-法兰12 (add)
    with BuildSketch(Plane(origin=(411.5, -225, -376.2634), x_dir=(0, -1, 0), z_dir=(0, 0, 1))):
        with BuildLine():
            Line((0, 0.7366), (0, 11.5))
            Line((0, 11.5), (1.5, 11.5))
            Line((1.5, 11.5), (1.5, 0.7366))
            ThreePointArc((1.5, 0.7366), (1.715745145, 0.215745145), (2.2366, 0))
            Line((2.2366, 0), (2.2366, -1.5))
            ThreePointArc((2.2366, -1.5), (0.655084973, -0.844915027), (0, 0.7366))
        make_face()
    extrude(amount=SM_EDGE_FLANGE_12_DEPTH)

    # 边线-法兰12 section 2 (across the edge) → 边线-法兰12 bend (add)
    with BuildSketch(Plane(origin=(-411.5, -225, 414.2634), x_dir=(0, -1, 0), z_dir=(0, 0, -1))):
        with BuildLine():
            Line((0, 0.7366), (0, 11.5))
            Line((0, 11.5), (1.5, 11.5))
            Line((1.5, 11.5), (1.5, 0.7366))
            ThreePointArc((1.5, 0.7366), (1.715745145, 0.215745145), (2.2366, 0))
            Line((2.2366, 0), (2.2366, -1.5))
            ThreePointArc((2.2366, -1.5), (0.655084973, -0.844915027), (0, 0.7366))
        make_face()
    extrude(amount=SM_EDGE_FLANGE_12_BEND_DEPTH)


solid = part.part
